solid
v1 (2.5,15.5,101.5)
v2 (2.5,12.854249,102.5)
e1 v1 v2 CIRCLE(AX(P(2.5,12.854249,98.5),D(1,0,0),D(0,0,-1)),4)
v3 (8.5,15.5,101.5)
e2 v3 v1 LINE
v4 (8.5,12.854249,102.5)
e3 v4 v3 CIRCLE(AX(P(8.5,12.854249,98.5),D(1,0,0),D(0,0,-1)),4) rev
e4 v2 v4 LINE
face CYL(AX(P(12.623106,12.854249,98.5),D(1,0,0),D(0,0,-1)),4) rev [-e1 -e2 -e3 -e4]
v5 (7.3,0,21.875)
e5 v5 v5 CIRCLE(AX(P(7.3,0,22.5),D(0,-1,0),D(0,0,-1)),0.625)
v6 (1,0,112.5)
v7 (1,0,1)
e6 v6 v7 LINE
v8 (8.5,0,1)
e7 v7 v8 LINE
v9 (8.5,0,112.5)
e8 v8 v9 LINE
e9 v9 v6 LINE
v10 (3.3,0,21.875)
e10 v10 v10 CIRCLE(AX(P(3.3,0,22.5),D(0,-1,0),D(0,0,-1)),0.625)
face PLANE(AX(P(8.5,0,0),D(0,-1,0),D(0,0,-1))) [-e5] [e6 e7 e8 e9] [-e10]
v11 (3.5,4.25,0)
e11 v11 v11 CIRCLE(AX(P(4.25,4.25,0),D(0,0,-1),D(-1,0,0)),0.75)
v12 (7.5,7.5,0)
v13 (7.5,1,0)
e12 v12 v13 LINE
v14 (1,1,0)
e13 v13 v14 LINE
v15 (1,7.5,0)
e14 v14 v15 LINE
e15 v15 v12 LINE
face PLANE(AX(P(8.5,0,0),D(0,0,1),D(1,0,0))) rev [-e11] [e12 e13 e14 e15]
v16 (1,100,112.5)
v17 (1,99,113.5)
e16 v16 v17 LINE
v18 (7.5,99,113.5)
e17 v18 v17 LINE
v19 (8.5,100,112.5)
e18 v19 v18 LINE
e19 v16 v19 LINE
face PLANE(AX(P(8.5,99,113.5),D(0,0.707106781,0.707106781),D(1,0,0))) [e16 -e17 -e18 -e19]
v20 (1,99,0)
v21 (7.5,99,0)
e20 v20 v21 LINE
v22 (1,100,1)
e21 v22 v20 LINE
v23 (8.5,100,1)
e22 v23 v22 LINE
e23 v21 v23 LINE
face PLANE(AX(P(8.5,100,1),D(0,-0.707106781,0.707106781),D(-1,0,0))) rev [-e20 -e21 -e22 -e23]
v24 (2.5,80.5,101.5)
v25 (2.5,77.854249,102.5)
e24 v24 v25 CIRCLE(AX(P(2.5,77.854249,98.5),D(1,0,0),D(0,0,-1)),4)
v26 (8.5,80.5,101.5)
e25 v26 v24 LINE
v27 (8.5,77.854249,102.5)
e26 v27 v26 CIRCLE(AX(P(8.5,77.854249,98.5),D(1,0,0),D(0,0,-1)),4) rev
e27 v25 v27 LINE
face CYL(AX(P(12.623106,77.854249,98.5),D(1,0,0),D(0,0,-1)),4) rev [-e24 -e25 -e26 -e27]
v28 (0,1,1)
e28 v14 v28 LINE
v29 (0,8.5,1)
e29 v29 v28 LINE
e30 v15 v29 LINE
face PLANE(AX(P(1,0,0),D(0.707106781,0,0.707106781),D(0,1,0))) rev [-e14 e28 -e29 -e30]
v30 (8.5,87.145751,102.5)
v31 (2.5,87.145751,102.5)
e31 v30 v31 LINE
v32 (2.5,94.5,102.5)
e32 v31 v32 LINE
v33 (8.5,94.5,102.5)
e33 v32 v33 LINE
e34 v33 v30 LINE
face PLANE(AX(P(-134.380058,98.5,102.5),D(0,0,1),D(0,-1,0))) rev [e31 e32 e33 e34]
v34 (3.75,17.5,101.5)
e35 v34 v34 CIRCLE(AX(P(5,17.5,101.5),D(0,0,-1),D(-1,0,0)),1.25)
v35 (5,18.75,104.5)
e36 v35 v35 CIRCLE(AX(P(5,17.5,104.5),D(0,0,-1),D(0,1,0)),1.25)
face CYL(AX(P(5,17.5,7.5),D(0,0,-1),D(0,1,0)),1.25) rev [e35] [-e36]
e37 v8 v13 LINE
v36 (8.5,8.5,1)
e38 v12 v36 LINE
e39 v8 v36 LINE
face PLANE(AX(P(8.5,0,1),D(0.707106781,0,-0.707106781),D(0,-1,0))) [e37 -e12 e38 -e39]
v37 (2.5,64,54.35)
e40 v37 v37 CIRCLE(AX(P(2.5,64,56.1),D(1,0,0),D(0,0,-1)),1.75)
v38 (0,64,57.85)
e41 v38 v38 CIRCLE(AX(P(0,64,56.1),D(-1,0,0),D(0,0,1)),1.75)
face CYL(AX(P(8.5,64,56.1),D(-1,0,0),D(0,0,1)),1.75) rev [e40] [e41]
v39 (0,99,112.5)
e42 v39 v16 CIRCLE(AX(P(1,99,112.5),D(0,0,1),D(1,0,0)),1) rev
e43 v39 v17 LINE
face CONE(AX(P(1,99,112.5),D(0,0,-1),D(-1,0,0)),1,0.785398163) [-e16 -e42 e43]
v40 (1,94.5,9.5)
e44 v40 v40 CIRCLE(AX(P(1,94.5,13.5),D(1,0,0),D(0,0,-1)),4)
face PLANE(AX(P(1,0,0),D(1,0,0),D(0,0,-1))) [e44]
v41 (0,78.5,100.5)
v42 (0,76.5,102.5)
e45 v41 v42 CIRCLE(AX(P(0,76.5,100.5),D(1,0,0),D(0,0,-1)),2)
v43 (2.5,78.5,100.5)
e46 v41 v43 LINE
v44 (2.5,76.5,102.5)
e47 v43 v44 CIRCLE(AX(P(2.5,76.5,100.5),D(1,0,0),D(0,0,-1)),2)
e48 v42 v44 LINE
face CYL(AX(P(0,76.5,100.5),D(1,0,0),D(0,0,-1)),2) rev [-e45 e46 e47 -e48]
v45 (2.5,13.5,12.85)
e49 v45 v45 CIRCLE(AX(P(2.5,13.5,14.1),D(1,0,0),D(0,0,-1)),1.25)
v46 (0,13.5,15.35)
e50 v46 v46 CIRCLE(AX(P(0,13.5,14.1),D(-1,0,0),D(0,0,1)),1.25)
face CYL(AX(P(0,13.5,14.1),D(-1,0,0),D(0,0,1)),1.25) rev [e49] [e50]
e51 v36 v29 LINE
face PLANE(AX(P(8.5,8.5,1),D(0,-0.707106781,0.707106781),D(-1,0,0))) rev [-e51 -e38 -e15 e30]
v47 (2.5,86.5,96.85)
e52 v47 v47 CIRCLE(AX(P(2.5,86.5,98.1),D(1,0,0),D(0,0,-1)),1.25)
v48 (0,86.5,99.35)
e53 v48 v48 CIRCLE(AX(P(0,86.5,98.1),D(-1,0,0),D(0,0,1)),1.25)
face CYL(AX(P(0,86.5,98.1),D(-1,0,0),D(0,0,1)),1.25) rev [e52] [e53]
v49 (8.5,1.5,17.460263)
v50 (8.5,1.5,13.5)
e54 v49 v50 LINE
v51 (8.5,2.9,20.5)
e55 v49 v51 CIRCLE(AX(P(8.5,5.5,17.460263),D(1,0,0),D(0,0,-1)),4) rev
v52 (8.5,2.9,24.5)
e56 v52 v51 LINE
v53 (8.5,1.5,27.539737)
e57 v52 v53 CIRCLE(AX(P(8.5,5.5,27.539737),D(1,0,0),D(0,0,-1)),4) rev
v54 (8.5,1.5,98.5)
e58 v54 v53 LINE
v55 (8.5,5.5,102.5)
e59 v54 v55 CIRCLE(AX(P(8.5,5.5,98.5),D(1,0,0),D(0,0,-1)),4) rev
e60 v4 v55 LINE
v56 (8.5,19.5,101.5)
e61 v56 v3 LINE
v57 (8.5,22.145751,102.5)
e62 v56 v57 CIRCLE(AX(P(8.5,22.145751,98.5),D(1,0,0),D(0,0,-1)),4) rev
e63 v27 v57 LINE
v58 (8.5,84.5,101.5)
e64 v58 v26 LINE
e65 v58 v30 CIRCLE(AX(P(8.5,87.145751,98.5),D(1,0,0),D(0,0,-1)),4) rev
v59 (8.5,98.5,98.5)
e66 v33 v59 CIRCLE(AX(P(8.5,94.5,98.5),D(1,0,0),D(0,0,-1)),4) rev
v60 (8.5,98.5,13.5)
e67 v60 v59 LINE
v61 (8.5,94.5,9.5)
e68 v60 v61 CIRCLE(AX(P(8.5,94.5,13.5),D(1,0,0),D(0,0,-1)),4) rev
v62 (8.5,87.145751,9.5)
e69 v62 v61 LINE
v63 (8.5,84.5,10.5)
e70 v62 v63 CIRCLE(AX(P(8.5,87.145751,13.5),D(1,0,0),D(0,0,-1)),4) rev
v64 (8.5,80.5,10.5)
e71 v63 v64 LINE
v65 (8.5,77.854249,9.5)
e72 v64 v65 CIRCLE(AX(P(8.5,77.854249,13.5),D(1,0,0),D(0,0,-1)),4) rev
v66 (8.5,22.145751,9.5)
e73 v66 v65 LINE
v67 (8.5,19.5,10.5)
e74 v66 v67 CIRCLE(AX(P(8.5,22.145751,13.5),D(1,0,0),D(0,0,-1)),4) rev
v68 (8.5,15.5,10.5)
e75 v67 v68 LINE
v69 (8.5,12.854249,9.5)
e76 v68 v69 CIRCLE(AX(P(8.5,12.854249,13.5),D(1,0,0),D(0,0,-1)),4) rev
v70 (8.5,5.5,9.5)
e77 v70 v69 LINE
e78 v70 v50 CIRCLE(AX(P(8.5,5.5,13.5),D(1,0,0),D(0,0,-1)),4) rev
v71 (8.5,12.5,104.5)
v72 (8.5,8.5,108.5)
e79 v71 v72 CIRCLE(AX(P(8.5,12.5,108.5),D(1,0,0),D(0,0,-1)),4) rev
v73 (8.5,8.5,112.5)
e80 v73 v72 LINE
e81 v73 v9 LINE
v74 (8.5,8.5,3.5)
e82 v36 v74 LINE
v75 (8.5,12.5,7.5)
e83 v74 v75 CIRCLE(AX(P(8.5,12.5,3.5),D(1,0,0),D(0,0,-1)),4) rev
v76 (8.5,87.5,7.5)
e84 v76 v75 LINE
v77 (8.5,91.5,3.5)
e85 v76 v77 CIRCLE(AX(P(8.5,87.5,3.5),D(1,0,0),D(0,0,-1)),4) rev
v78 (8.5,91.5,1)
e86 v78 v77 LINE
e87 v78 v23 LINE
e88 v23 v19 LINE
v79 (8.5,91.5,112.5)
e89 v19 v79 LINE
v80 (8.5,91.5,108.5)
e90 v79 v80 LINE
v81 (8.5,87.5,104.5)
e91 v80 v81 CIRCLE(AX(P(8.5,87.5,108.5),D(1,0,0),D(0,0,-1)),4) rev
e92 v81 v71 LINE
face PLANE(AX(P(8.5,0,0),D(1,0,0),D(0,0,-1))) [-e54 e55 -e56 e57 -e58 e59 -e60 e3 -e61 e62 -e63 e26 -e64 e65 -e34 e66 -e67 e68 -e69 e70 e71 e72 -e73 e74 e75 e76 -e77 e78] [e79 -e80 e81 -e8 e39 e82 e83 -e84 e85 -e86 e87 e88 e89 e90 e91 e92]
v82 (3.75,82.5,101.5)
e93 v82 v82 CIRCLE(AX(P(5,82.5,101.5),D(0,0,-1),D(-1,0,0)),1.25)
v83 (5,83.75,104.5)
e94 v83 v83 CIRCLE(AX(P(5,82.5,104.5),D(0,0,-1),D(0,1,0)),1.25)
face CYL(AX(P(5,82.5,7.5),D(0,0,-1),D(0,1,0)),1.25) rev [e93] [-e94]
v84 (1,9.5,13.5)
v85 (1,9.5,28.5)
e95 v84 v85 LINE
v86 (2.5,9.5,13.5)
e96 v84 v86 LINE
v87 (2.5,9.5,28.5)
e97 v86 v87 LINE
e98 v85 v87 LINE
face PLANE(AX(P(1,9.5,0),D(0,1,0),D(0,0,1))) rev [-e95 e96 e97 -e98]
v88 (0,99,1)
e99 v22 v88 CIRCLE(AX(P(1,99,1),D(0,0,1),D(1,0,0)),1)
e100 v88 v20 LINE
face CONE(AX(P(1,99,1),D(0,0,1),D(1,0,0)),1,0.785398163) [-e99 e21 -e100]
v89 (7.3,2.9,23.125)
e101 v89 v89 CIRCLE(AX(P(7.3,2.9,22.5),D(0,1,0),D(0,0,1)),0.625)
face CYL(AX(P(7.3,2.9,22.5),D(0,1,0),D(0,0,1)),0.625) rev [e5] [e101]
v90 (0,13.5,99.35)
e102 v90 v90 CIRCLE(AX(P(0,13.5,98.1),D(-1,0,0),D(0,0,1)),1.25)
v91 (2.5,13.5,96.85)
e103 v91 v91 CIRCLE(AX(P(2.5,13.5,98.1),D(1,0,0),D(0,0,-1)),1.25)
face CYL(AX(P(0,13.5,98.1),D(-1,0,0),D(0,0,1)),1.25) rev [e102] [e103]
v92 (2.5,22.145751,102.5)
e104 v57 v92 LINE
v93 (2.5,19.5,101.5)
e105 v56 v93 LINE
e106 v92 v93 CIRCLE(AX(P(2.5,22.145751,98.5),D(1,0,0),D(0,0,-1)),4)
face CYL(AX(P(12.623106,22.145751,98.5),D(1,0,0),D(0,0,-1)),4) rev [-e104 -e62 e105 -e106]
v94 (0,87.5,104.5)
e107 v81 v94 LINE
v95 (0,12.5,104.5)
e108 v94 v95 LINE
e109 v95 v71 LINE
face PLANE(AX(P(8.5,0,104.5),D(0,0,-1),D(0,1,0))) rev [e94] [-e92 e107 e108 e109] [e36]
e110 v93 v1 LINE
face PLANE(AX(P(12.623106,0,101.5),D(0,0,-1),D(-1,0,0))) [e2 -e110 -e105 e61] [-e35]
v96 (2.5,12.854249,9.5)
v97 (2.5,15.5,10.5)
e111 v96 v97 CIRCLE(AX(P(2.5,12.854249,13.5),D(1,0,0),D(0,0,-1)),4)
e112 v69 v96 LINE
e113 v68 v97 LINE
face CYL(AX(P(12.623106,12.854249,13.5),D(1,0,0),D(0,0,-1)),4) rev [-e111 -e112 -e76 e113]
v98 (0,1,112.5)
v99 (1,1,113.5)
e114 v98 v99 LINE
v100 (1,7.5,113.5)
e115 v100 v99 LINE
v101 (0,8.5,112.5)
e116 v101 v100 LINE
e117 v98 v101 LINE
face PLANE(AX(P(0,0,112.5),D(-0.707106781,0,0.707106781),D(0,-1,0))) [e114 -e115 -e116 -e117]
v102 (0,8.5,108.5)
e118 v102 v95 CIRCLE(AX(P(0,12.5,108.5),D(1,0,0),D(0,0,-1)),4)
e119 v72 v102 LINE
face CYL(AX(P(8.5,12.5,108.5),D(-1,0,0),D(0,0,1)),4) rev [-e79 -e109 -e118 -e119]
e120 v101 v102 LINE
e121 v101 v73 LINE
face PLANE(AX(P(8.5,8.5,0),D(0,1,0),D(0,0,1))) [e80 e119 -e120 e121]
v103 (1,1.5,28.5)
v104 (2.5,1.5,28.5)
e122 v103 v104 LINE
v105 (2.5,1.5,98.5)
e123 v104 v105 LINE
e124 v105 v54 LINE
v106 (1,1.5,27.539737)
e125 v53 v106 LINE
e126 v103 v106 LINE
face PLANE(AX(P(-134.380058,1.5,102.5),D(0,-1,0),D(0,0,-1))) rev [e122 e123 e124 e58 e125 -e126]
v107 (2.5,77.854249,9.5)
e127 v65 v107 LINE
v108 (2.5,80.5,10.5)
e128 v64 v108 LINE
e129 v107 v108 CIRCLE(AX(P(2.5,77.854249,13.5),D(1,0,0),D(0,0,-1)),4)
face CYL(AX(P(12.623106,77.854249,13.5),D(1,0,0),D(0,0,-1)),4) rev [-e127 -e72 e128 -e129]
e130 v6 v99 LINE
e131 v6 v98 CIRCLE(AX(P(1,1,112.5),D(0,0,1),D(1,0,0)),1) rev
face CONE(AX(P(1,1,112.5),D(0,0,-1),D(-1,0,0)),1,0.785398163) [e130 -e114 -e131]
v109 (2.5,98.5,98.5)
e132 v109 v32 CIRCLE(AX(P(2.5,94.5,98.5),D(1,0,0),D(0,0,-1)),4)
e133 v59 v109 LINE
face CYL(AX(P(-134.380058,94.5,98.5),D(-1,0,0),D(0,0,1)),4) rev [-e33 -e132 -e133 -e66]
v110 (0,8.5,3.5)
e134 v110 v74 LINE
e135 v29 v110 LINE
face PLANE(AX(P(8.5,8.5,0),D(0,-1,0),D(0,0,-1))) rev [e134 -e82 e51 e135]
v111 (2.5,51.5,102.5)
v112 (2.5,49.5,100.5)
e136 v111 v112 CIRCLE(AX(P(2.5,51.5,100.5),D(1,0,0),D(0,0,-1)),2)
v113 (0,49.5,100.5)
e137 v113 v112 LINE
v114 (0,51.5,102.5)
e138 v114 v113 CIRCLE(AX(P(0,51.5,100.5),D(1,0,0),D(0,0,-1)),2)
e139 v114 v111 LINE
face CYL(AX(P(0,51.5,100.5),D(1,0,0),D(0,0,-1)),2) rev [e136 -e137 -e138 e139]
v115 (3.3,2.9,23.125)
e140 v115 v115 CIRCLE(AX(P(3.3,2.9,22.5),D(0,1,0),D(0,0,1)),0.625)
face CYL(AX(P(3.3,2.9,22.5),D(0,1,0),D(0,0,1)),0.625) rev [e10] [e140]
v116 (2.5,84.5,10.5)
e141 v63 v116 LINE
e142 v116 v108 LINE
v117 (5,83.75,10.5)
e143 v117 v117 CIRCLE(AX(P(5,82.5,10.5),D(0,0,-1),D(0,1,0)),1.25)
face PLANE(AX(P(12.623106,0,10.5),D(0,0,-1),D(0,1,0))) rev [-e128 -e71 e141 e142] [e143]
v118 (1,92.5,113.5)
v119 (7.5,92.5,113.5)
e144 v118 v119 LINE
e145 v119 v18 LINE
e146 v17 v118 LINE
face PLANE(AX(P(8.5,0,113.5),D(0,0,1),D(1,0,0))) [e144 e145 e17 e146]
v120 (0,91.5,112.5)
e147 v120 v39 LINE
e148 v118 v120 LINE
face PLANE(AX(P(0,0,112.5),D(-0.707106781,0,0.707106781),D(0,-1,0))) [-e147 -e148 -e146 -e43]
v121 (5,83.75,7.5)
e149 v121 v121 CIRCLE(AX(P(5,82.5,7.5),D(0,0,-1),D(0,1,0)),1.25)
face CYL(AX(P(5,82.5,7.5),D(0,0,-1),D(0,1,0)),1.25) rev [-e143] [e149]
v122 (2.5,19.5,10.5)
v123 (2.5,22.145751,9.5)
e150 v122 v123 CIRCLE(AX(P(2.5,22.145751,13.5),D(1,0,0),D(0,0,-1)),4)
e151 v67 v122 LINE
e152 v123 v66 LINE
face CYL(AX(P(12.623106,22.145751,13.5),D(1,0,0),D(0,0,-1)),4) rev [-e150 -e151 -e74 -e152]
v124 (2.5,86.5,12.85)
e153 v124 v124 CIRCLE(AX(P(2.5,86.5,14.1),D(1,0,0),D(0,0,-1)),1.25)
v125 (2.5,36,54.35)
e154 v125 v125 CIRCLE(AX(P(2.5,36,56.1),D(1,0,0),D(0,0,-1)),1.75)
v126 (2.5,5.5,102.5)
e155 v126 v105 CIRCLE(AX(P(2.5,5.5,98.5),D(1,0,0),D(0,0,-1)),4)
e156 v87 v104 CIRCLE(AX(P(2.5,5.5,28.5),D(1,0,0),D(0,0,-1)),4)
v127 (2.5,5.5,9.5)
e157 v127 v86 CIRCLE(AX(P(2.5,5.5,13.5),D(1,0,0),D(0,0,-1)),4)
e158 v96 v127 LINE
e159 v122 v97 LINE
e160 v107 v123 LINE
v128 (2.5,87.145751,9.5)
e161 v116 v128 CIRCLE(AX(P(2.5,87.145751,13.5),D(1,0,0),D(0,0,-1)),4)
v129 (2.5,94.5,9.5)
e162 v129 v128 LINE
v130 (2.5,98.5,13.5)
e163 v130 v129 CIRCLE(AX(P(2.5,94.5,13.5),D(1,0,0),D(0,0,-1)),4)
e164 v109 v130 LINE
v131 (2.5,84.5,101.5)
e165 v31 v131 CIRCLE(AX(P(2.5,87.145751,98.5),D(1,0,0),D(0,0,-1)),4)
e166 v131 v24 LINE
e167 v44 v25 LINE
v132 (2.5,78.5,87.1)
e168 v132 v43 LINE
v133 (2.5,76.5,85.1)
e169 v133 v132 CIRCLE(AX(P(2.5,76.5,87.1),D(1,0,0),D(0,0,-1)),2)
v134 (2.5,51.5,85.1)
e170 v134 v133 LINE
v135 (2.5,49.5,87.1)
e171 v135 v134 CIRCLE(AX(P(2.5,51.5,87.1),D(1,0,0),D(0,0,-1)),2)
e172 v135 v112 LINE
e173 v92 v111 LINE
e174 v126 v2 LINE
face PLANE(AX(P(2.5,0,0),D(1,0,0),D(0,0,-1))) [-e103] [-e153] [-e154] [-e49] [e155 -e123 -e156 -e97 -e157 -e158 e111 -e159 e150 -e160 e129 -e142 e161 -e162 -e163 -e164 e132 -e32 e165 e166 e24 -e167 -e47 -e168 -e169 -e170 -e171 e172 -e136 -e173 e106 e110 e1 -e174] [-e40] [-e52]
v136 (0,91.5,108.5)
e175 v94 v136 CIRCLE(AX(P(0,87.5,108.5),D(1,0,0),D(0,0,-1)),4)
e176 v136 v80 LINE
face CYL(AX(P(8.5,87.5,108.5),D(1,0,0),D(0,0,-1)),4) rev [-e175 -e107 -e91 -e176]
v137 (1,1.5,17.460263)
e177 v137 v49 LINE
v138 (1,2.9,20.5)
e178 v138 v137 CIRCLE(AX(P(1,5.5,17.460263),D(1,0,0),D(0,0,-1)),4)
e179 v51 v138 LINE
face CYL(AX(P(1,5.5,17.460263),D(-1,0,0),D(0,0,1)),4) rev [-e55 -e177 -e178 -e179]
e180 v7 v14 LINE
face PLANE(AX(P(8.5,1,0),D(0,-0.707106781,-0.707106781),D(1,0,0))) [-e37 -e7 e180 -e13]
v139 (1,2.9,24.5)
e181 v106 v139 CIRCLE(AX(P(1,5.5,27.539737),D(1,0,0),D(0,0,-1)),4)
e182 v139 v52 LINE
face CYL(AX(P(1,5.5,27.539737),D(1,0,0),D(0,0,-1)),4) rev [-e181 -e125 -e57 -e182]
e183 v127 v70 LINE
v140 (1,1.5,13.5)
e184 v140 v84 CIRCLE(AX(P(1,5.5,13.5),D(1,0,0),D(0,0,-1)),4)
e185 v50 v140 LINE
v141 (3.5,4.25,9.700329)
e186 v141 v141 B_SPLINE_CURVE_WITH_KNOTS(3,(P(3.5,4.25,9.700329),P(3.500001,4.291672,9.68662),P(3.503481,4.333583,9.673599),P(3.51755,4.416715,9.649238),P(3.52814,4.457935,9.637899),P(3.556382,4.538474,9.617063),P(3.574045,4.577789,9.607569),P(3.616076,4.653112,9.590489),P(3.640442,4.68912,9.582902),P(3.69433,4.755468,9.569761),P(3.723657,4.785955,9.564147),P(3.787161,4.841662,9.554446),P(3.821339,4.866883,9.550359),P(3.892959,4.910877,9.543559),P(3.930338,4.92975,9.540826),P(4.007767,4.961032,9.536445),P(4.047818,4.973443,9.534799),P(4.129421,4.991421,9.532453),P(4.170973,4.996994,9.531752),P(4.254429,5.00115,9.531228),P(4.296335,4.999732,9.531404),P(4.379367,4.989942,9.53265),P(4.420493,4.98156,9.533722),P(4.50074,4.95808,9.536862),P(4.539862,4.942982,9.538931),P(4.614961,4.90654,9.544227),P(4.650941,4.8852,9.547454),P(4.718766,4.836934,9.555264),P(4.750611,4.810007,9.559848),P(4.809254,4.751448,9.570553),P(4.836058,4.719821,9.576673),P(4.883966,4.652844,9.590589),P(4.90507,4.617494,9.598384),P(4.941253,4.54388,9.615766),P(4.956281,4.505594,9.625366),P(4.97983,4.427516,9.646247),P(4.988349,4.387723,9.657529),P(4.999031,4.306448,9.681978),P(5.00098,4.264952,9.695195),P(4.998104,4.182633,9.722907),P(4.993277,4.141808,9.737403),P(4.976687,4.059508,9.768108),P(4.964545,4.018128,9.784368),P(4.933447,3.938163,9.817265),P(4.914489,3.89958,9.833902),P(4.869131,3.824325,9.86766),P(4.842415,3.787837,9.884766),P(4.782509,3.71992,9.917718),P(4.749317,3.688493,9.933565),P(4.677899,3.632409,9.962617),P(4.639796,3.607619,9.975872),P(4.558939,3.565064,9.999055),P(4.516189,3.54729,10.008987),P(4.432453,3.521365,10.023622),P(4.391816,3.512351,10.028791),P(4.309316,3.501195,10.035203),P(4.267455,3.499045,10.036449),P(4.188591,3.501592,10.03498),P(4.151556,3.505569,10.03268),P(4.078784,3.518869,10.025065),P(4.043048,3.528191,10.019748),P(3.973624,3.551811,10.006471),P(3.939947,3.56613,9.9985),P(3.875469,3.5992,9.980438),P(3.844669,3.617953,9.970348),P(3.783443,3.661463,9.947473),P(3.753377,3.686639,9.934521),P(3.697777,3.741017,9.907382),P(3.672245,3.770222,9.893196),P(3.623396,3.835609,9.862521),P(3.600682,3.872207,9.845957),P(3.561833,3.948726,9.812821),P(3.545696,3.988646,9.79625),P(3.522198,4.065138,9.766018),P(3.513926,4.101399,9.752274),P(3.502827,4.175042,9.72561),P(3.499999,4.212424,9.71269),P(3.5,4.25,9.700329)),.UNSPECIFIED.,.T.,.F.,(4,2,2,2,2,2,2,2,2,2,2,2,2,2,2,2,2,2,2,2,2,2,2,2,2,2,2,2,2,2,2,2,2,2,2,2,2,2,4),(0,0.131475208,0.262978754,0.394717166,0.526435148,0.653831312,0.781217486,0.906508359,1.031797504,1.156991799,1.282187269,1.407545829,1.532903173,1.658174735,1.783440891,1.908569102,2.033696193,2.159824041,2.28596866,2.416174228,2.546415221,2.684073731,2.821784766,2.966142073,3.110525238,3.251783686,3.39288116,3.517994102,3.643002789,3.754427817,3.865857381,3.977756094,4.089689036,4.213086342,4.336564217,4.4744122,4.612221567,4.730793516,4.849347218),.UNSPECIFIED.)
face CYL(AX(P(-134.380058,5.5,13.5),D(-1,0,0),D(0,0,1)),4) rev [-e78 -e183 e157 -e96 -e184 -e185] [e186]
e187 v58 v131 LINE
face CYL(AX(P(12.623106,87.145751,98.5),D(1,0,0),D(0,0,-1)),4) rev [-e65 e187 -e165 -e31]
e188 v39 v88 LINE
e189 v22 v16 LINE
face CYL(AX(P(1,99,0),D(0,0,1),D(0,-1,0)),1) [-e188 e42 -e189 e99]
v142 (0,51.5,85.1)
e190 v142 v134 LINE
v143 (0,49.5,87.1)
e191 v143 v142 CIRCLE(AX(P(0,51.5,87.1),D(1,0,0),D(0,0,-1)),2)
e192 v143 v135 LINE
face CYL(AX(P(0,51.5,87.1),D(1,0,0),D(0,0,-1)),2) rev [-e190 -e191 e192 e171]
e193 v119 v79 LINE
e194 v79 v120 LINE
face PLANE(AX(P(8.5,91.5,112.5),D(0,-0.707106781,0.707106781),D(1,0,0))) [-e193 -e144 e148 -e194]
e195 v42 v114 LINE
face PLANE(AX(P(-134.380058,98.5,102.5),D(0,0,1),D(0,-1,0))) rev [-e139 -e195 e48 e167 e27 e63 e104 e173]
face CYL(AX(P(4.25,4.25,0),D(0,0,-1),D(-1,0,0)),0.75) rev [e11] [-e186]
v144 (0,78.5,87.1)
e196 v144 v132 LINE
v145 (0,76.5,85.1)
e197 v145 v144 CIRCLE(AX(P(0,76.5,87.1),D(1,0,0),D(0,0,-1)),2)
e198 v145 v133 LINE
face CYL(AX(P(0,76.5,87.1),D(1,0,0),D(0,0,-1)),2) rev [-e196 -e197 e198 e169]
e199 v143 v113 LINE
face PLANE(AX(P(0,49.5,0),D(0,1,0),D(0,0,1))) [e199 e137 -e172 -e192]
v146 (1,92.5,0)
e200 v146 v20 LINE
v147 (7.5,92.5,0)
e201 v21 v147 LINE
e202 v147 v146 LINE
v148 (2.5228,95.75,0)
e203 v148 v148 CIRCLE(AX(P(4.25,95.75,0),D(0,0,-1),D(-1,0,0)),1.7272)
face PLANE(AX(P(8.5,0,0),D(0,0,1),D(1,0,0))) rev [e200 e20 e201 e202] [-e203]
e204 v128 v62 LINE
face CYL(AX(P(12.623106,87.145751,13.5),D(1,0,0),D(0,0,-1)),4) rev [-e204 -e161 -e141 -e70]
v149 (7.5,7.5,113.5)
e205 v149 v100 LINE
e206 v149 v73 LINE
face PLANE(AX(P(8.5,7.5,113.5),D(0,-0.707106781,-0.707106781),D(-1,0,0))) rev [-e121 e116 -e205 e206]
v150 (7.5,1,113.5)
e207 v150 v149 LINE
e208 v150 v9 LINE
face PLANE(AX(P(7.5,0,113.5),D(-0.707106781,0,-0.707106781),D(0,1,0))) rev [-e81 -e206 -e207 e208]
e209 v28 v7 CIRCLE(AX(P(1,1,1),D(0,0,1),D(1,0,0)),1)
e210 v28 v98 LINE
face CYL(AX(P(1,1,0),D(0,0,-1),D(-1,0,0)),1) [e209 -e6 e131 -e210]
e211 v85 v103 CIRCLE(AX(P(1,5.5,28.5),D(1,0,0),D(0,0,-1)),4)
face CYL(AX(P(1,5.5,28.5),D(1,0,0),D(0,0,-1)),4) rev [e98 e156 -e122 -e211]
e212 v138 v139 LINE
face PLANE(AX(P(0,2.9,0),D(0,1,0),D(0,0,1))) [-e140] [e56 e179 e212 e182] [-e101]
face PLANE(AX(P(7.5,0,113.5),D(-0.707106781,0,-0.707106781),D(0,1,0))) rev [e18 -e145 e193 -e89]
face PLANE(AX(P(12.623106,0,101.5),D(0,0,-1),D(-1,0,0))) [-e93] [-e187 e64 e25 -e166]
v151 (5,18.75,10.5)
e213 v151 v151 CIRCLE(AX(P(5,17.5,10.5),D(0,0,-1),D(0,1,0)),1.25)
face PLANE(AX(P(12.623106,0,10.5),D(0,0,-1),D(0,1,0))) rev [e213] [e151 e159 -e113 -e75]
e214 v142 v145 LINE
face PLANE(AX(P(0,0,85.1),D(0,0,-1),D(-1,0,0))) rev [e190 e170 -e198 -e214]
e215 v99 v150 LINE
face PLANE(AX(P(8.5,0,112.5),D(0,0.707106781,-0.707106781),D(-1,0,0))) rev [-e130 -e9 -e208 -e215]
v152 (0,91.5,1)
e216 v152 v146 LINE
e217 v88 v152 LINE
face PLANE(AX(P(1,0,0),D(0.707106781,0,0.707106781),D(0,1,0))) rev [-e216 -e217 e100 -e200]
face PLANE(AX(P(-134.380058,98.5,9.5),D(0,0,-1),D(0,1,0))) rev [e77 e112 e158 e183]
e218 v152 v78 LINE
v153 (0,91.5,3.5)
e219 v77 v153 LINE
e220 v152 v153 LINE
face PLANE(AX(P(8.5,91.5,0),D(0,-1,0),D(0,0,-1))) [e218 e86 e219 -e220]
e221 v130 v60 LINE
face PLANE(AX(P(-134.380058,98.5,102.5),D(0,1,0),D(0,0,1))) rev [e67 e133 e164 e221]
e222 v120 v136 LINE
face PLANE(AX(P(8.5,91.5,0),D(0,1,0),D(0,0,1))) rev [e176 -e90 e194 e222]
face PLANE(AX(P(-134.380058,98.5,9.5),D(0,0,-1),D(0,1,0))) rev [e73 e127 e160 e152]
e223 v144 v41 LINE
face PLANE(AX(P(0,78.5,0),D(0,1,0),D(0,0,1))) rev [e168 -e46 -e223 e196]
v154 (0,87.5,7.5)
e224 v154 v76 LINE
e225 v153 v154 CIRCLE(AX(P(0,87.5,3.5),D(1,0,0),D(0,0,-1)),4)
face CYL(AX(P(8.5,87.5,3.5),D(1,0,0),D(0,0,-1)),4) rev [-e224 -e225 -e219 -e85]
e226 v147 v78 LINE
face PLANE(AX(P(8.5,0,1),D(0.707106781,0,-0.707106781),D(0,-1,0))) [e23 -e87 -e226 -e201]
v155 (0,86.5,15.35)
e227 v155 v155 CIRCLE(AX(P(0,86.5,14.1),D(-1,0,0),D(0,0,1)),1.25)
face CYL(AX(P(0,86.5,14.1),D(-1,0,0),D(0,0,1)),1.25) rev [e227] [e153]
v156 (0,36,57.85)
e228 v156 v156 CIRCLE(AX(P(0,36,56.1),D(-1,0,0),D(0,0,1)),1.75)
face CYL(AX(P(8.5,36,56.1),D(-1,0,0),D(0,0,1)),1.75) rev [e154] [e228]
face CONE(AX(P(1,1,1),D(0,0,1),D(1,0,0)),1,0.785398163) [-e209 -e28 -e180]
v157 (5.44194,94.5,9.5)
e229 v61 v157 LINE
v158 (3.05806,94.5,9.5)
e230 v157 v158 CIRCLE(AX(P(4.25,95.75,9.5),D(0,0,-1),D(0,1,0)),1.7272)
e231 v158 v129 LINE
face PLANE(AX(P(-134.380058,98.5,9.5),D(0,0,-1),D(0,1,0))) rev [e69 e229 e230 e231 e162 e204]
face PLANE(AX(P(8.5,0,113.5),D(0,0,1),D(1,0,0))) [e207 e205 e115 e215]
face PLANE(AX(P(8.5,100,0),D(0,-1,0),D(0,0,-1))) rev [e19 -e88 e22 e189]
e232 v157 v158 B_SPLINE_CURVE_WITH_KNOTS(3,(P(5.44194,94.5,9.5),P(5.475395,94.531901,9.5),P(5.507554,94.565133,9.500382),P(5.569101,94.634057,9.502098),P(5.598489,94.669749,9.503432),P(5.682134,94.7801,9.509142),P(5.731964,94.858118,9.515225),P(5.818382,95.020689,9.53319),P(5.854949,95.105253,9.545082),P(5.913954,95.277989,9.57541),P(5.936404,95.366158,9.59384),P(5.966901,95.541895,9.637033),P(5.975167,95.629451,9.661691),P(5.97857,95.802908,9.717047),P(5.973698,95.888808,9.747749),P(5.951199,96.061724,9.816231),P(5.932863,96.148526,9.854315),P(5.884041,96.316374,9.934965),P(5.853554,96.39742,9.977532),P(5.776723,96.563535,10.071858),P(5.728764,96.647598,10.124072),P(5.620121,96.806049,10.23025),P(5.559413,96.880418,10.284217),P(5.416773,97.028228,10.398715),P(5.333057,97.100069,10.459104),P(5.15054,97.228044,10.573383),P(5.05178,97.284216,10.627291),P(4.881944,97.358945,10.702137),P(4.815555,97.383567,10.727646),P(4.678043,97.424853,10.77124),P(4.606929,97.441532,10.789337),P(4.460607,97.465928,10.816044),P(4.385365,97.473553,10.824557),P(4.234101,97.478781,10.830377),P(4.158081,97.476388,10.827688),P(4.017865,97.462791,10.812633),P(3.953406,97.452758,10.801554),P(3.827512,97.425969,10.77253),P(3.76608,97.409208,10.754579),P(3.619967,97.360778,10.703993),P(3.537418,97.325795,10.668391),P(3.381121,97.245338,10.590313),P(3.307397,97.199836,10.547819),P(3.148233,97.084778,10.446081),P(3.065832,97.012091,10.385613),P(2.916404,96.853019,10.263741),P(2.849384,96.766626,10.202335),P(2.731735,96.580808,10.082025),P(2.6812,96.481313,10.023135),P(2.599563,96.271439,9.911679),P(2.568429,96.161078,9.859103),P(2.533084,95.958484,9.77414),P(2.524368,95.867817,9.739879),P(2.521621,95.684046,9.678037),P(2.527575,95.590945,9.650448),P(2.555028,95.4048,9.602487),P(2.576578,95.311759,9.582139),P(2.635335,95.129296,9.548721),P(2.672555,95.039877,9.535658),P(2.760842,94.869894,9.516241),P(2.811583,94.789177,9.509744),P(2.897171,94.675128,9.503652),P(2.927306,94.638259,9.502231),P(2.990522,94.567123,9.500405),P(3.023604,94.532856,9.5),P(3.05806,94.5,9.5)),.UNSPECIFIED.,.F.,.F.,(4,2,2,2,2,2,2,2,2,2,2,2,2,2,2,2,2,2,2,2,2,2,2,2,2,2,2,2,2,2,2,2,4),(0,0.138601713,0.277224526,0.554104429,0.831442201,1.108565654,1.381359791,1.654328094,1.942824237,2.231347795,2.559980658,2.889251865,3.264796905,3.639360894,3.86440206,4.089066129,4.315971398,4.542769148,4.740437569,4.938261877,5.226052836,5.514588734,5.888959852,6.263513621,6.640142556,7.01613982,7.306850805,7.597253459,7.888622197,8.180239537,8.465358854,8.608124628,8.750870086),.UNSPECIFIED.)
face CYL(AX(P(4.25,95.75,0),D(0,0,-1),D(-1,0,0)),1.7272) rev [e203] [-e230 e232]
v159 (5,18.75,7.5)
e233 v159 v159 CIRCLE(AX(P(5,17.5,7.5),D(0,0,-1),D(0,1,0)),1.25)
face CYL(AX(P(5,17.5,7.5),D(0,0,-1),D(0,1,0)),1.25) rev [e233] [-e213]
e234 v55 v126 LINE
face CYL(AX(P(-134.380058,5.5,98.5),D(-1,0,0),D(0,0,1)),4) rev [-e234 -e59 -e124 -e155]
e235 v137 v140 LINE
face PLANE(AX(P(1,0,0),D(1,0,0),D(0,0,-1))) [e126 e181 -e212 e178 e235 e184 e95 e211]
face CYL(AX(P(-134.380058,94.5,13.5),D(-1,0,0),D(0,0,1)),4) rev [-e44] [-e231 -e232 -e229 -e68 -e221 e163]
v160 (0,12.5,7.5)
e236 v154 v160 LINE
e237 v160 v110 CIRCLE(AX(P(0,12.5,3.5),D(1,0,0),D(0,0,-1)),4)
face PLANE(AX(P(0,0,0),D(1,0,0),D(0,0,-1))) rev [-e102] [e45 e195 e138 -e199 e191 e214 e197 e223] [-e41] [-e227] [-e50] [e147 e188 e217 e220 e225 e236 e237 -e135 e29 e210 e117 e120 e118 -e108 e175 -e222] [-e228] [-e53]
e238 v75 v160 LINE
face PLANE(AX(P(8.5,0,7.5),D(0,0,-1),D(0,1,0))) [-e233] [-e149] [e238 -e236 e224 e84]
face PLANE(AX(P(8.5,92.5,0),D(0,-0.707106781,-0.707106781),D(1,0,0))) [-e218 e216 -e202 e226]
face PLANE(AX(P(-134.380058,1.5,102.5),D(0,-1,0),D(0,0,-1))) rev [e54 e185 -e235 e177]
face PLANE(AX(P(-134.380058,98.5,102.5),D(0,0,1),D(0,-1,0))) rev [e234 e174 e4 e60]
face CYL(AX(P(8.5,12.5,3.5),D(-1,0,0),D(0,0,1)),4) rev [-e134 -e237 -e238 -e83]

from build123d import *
from build123d.topology import SkipClean

# Parameters (mm, degrees)
SKETCH1_W                    = 81
SKETCH1_H                    = 83
BODY_DEPTH                   = 8.5
RAILFILLET_R                 = 1
FOOTCHAMFER_SIZE             = 1
SKETCH5_W                    = 81
SKETCH5_H                    = 83
BOSS_EXTRUDE3_DEPTH          = 8.5
SKETCH6_W                    = 93
SKETCH6_H                    = 97
CUT_EXTRUDE3_DEPTH           = 6
F_8_36_TAPPED_HOLE1_D        = 3.4544
F_8_36_TAPPED_HOLE1_DEPTH    = 13.55
F_8_36_TAPPED_HOLE1_TIP      = 1.037806461
SKETCH57_W                   = 1
SKETCH57_H                   = 4
BOSS_EXTRUDE24_DEPTH         = 6
FILLET5_R                    = 4
M3X0_5_TAPPED_HOLE1_D        = 2.5
FILLET7_R                    = 4
M3X0_5_TAPPED_HOLE2_D        = 2.5
M3X0_5_TAPPED_HOLE2_DEPTH    = 7.5
M3X0_5_TAPPED_HOLE2_TIP      = 0.751075774
FILLET8_R                    = 4
SKETCH70_R                   = 4
CUT_EXTRUDE14_DEPTH          = 1.5
SKETCH75_W                   = 7.5
SKETCH75_H                   = 4
BOSS_EXTRUDE25_DEPTH         = 1.4
M1_6X0_35_TAPPED_HOLE1_D     = 1.25
M1_6X0_35_TAPPED_HOLE1_DEPTH = 4.25
M1_6X0_35_TAPPED_HOLE1_TIP   = 0.375537887
FILLET9_R                    = 4
F_1_5MM_DOWEL_HOLE1_REACH    = 153.507
F_1_5MM_DOWEL_HOLE1_BORE_R   = 0.75
CUT_EXTRUDE15_DEPTH          = 152.387747196
SKETCH84_R                   = 1.75
CUT_EXTRUDE17_DEPTH          = 152.507425566


# Some blends are built 0.0001 mm under size
with BuildPart() as part:
    # Sketch1 → Body (new body)
    with BuildSketch(Plane(origin=(0, 0, 0), x_dir=(0, 0, -1), z_dir=(1, 0, 0))):
        Polygon((-113.5, 0), (0, 0), (0, 8.5), (-7.5, 8.5), (-7.5, 91.5), (0, 91.5), (0, 100), (-113.5, 100), (-113.5, 91.5), (-104.5, 91.5), (-104.5, 8.5), (-113.5, 8.5), align=None)
        with Locations((-56, 50)):
            Rectangle(SKETCH1_W, SKETCH1_H, mode=Mode.SUBTRACT)
    extrude(amount=BODY_DEPTH)

    # RailFillet
    railfillet_edges = [part.edges().sort_by_distance(p)[0] for p in [
        (0, 0, 56.75),
        (0, 100, 56.75),
    ]]
    fillet(railfillet_edges, radius=RAILFILLET_R)

    # FootChamfer
    footchamfer_edges = [part.edges().sort_by_distance(p)[0] for p in [
        (8.5, 95.75, 0),
        (0, 95.25, 113.5),
        (8.5, 95.75, 113.5),
        (0, 95.25, 0),
        (4.25, 8.5, 0),
        (4.75, 0, 0),
        (4.75, 0, 113.5),
        (4.25, 8.5, 113.5),
        (4.25, 91.5, 113.5),
        (4.75, 100, 113.5),
        (4.75, 100, 0),
        (4.25, 91.5, 0),
        (8.5, 4.25, 113.5),
        (8.5, 4.25, 0),
        (0, 4.75, 0),
        (0, 4.75, 113.5),
        (0.292893219, 0.292893219, 113.5),
        (0.292893219, 0.292893219, 0),
        (0.292893219, 99.707106781, 113.5),
        (0.292893219, 99.707106781, 0),
    ]]
    chamfer(footchamfer_edges, length=FOOTCHAMFER_SIZE - 0.0001)  # a hair under: the kernel refuses the full size

    # Sketch5 → Boss-Extrude3 (add)
    with BuildSketch(Plane(origin=(8.5, 0, 0), x_dir=(0, 0, -1), z_dir=(1, 0, 0))):
        with Locations((-56, 50)):
            Rectangle(SKETCH5_W, SKETCH5_H)
    extrude(amount=-BOSS_EXTRUDE3_DEPTH)

    # Sketch6 → Cut-Extrude3 (cut)
    with BuildSketch(Plane(origin=(8.5, 0, 0), x_dir=(0, 0, -1), z_dir=(1, 0, 0))):
        with Locations((-56, 50)):
            Rectangle(SKETCH6_W, SKETCH6_H)
    extrude(amount=-CUT_EXTRUDE3_DEPTH, mode=Mode.SUBTRACT)

    # #8-36 Tapped Hole1
    with Locations(Plane(origin=(0, 0, 0), x_dir=(-1, 0, 0), z_dir=(0, 0, -1))):
        with Locations((-4.25, 95.75)):
            Hole(F_8_36_TAPPED_HOLE1_D / 2, depth=F_8_36_TAPPED_HOLE1_DEPTH)
            with Locations((0, 0, -(F_8_36_TAPPED_HOLE1_DEPTH + F_8_36_TAPPED_HOLE1_TIP / 2))):  # 118° drill point
                Cone(0, F_8_36_TAPPED_HOLE1_D / 2, F_8_36_TAPPED_HOLE1_TIP, mode=Mode.SUBTRACT)

    # Sketch57 → Boss-Extrude24 (add)
    with BuildSketch(Plane(origin=(2.5, 0, 0), x_dir=(0, 0, -1), z_dir=(1, 0, 0))):
        with Locations((-102, 82.5)):
            Rectangle(SKETCH57_W, SKETCH57_H)
        with Locations((-102, 17.5)):
            Rectangle(SKETCH57_W, SKETCH57_H)
        with Locations((-10, 17.5)):
            Rectangle(SKETCH57_W, SKETCH57_H)
        with Locations((-10, 82.5)):
            Rectangle(SKETCH57_W, SKETCH57_H)
    extrude(amount=BOSS_EXTRUDE24_DEPTH)

    # Fillet5
    # the kernel refuses this fillet: 4 mm, written as the material it adds along each edge
    with BuildSketch(Plane(origin=(2.5, 84.5, 102.5), x_dir=(0, 1, 0), z_dir=(1, 0, 0)), Plane(origin=(2.5, 19.5, 102.5), x_dir=(0, 1, 0), z_dir=(1, 0, 0)), Plane(origin=(2.5, 15.5, 9.5), x_dir=(0, -1, 0), z_dir=(1, 0, 0)), Plane(origin=(2.5, 80.5, 9.5), x_dir=(0, -1, 0), z_dir=(1, 0, 0))) as fillet5_piece_1:
        with BuildLine():
            CenterArc((2.645751311, -4), FILLET5_R, 90, 41.409622109)
            Line((0, -1), (-0.052915026, -0.94))
            ThreePointArc((-0.052915026, -0.94), (-0.08, -0.5), (-0.08, 0))
            Line((-0.08, 0), (0, 0.08))
            Line((0, 0.08), (2.645751311, 0.08))
            Line((2.645751311, 0.08), (2.645751311, 0))
        make_face()
    extrude(amount=6)
    with BuildSketch(Plane(origin=(2.5, 80.5, 102.5), x_dir=(0, -1, 0), z_dir=(1, 0, 0)), Plane(origin=(2.5, 15.5, 102.5), x_dir=(0, -1, 0), z_dir=(1, 0, 0)), Plane(origin=(2.5, 19.5, 9.5), x_dir=(0, 1, 0), z_dir=(1, 0, 0)), Plane(origin=(2.5, 84.5, 9.5), x_dir=(0, 1, 0), z_dir=(1, 0, 0))) as fillet5_piece_2:
        with BuildLine():
            CenterArc((2.645751311, 4), FILLET5_R, 228.590377891, 41.409622109)
            Line((0, 1), (-0.052915026, 0.94))
            ThreePointArc((-0.052915026, 0.94), (-0.08, 0.5), (-0.08, 0))
            Line((-0.08, 0), (0, -0.08))
            Line((0, -0.08), (2.645751311, -0.08))
            Line((2.645751311, -0.08), (2.645751311, 0))
        make_face()
    extrude(amount=6)

    # M3x0.5 Tapped Hole1 (through all)
    with Locations(Plane(origin=(0, 0, 7.5), x_dir=(-1, 0, 0), z_dir=(0, 0, -1))):
        with Locations((-5, 82.5), (-5, 17.5)):
            Hole(M3X0_5_TAPPED_HOLE1_D / 2)

    # Fillet7
    # the kernel refuses this fillet: 4 mm, written as the material it adds along each edge
    with BuildSketch(Plane(origin=(8.5, 1.5, 102.5), x_dir=(0, 1, 0), z_dir=(-1, 0, 0)), Plane(origin=(8.5, 98.5, 102.5), x_dir=(0, 0, -1), z_dir=(-1, 0, 0)), Plane(origin=(8.5, 1.5, 9.5), x_dir=(0, 0, 1), z_dir=(-1, 0, 0))) as fillet7_piece_1:
        with BuildLine():
            CenterArc((FILLET7_R, FILLET7_R), FILLET7_R, 180, 90)
            Line((0, FILLET7_R), (0, 0))
            Line((0, 0), (FILLET7_R, 0))
        make_face()
    extrude(amount=6)
    with BuildSketch(Plane(origin=(8.5, 98.5, 9.5), x_dir=(0, -1, 0), z_dir=(-1, 0, 0))) as fillet7_piece_2_section:
        with BuildLine():
            CenterArc((FILLET7_R, FILLET7_R), FILLET7_R, 180, 90)
            Line((0, FILLET7_R), (0, 0))
            Line((0, 0), (FILLET7_R, 0))
        make_face()
    fillet7_piece_2 = extrude(amount=6, mode=Mode.PRIVATE)
    fillet7_piece_2 = fillet7_piece_2 - Plane(origin=(4.25, 95.75, 10.518489618), x_dir=(1, 0, 0), z_dir=(0, 0, 1)) * Cylinder(1.7272, 28, mode=Mode.PRIVATE)
    add(fillet7_piece_2)

    # M3x0.5 Tapped Hole2
    with Locations(Plane.ZY):
        with Locations((14.1, 13.5), (14.1, 86.5), (98.1, 86.5), (98.1, 13.5)):
            Hole(M3X0_5_TAPPED_HOLE2_D / 2, depth=M3X0_5_TAPPED_HOLE2_DEPTH)
            with Locations((0, 0, -(M3X0_5_TAPPED_HOLE2_DEPTH + M3X0_5_TAPPED_HOLE2_TIP / 2))):  # 118° drill point
                Cone(0, M3X0_5_TAPPED_HOLE2_D / 2, M3X0_5_TAPPED_HOLE2_TIP, mode=Mode.SUBTRACT)

    # Fillet8
    fillet8_edges = [part.edges().sort_by_distance(p)[0] for p in [
        (4.25, 8.5, 7.5),
        (4.25, 8.5, 104.5),
        (4.25, 91.5, 104.5),
        (4.25, 91.5, 7.5),
    ]]
    fillet(fillet8_edges, radius=FILLET8_R)

    # Sketch70 → Cut-Extrude14 (cut)
    with BuildSketch(Plane(origin=(2.5, 0, 0), x_dir=(0, 0, -1), z_dir=(1, 0, 0))):
        with BuildLine():
            ThreePointArc((-13.5, 1.5), (-9.5, 5.5), (-13.5, 9.5))
            Line((-13.5, 9.5), (-28.5, 9.5))
            ThreePointArc((-28.5, 9.5), (-32.5, 5.5), (-28.5, 1.5))
            Line((-28.5, 1.5), (-13.5, 1.5))
        make_face()
        with Locations((-13.5, 94.5)):
            Circle(SKETCH70_R)
    extrude(amount=-CUT_EXTRUDE14_DEPTH, mode=Mode.SUBTRACT)

    # Sketch75 → Boss-Extrude25 (add)
    with BuildSketch(Plane(origin=(0, 1.5, 0), x_dir=(1, 0, 0), z_dir=(0, 1, 0))):
        with Locations((4.75, -22.5)):
            Rectangle(SKETCH75_W, SKETCH75_H)
    extrude(amount=BOSS_EXTRUDE25_DEPTH)

    # M1.6x0.35 Tapped Hole1
    with Locations(Plane(origin=(0, 2.9, 0), x_dir=(1, 0, 0), z_dir=(0, 1, 0))):
        with Locations((3.3, -22.5), (7.3, -22.5)):
            Hole(M1_6X0_35_TAPPED_HOLE1_D / 2, depth=M1_6X0_35_TAPPED_HOLE1_DEPTH)
            with Locations((0, 0, -(M1_6X0_35_TAPPED_HOLE1_DEPTH + M1_6X0_35_TAPPED_HOLE1_TIP / 2))):  # 118° drill point
                Cone(0, M1_6X0_35_TAPPED_HOLE1_D / 2, M1_6X0_35_TAPPED_HOLE1_TIP, mode=Mode.SUBTRACT)

    # Fillet9
    # the kernel refuses this fillet: 4 mm, written as the material it adds along each edge
    with BuildSketch(Plane(origin=(8.5, 1.5, 24.5), x_dir=(0, 1, 0), z_dir=(-1, 0, 0))) as fillet9_piece_1:
        with BuildLine():
            CenterArc((4, -3.039736831), FILLET9_R, 130.541601874, 49.458398126)
            Line((0, -3.039736831), (-0.08, -3.039736831))
            Line((-0.08, -3.039736831), (-0.08, 0))
            Line((-0.08, 0), (0, 0.08))
            ThreePointArc((0, 0.08), (0.7, 0.08), (1.348, 0.060794737))
            Line((1.348, 0.060794737), (1.4, 0))
        make_face()
    extrude(amount=6)
    with BuildSketch(Plane(origin=(2.5, 1.5, 20.5), x_dir=(0, 0, -1), z_dir=(1, 0, 0))) as fillet9_piece_2:
        with BuildLine():
            CenterArc((3.039736831, 4), FILLET9_R, 220.541601874, 49.458398126)
            Line((0, 1.4), (-0.060794737, 1.348))
            ThreePointArc((-0.060794737, 1.348), (-0.08, 0.7), (-0.08, 0))
            Line((-0.08, 0), (0, -0.08))
            Line((0, -0.08), (3.039736831, -0.08))
            Line((3.039736831, -0.08), (3.039736831, 0))
        make_face()
    extrude(amount=6)
    with BuildSketch(Plane(origin=(1, 1.5, 20.5), x_dir=(0, 1, 0), z_dir=(1, 0, 0)), Plane(origin=(2.5, 1.5, 24.5), x_dir=(0, 1, 0), z_dir=(-1, 0, 0))) as fillet9_piece_3:
        with BuildLine():
            CenterArc((4, -3.039736831), FILLET9_R, 130.541601874, 49.458398126)
            Line((0, -3.039736831), (-0.08, -3.039736831))
            Line((-0.08, -3.039736831), (-0.08, 0))
            Line((-0.08, 0), (0, 0.08))
            ThreePointArc((0, 0.08), (0.7, 0.08), (1.348, 0.060794737))
            Line((1.348, 0.060794737), (1.4, 0))
        make_face()
    extrude(amount=1.5)

    # Ø1.5mm Dowel Hole1 bore → Ø1.5mm Dowel Hole1 (cut, up to next)
    with BuildSketch(Plane(origin=(0, 0, 0), x_dir=(-1, 0, 0), z_dir=(0, 0, -1)), mode=Mode.PRIVATE) as f_1_5mm_dowel_hole1_sk1:
        with Locations((-4.25, 4.25)):
            Circle(F_1_5MM_DOWEL_HOLE1_BORE_R)
    f_1_5mm_dowel_hole1_tool1 = extrude(f_1_5mm_dowel_hole1_sk1.sketch, amount=-F_1_5MM_DOWEL_HOLE1_REACH, mode=Mode.PRIVATE) & part.part
    add(f_1_5mm_dowel_hole1_tool1.solids().sort_by_distance((4.25, 4.25, 0))[0], mode=Mode.SUBTRACT)

    # Sketch81 → Cut-Extrude15 (cut, through all)
    with SkipClean():  # the faces are left unmerged after this step: merging them gives an invalid solid
        with BuildSketch(Plane(origin=(2.5, 0, 0), x_dir=(0, 0, -1), z_dir=(1, 0, 0))):
            with BuildLine():
                ThreePointArc((-102.5, 51.5), (-101.914213562, 50.085786438), (-100.5, 49.5))
                ThreePointArc((-100.5, 49.5), (-99.085786438, 50.085786438), (-98.5, 51.5))
                Line((-98.5, 51.5), (-98.5, 76.5))
                ThreePointArc((-98.5, 76.5), (-99.085786438, 77.914213562), (-100.5, 78.5))
                ThreePointArc((-100.5, 78.5), (-101.914213562, 77.914213562), (-102.5, 76.5))
                Line((-102.5, 76.5), (-102.5, 51.5))
            make_face()
            with BuildLine():
                Line((-85.1, 51.5), (-85.1, 76.5))
                ThreePointArc((-85.1, 76.5), (-87.1, 78.5), (-89.1, 76.5))
                Line((-89.1, 76.5), (-89.1, 51.5))
                ThreePointArc((-89.1, 51.5), (-87.1, 49.5), (-85.1, 51.5))
            make_face()
            with BuildLine():
                ThreePointArc((-87.1, 49.5), (-88.514213562, 50.085786438), (-89.1, 51.5))
                Line((-89.1, 51.5), (-89.1, 76.5))
                ThreePointArc((-89.1, 76.5), (-88.514213562, 77.914213562), (-87.1, 78.5))
                Line((-87.1, 78.5), (-100.5, 78.5))
                ThreePointArc((-100.5, 78.5), (-99.085786438, 77.914213562), (-98.5, 76.5))
                Line((-98.5, 76.5), (-98.5, 51.5))
                ThreePointArc((-98.5, 51.5), (-99.085786438, 50.085786438), (-100.5, 49.5))
                Line((-100.5, 49.5), (-87.1, 49.5))
            make_face()
        extrude(amount=-CUT_EXTRUDE15_DEPTH, mode=Mode.SUBTRACT)

    # Sketch84 → Cut-Extrude17 (cut, through all)
    with SkipClean():  # the faces are left unmerged after this step: merging them gives an invalid solid
        with BuildSketch(Plane.ZY):
            with Locations((56.1, 36)):
                Circle(SKETCH84_R)
            with Locations((56.1, 64)):
                Circle(SKETCH84_R)
        extrude(amount=-CUT_EXTRUDE17_DEPTH, mode=Mode.SUBTRACT)


solid = part.part
